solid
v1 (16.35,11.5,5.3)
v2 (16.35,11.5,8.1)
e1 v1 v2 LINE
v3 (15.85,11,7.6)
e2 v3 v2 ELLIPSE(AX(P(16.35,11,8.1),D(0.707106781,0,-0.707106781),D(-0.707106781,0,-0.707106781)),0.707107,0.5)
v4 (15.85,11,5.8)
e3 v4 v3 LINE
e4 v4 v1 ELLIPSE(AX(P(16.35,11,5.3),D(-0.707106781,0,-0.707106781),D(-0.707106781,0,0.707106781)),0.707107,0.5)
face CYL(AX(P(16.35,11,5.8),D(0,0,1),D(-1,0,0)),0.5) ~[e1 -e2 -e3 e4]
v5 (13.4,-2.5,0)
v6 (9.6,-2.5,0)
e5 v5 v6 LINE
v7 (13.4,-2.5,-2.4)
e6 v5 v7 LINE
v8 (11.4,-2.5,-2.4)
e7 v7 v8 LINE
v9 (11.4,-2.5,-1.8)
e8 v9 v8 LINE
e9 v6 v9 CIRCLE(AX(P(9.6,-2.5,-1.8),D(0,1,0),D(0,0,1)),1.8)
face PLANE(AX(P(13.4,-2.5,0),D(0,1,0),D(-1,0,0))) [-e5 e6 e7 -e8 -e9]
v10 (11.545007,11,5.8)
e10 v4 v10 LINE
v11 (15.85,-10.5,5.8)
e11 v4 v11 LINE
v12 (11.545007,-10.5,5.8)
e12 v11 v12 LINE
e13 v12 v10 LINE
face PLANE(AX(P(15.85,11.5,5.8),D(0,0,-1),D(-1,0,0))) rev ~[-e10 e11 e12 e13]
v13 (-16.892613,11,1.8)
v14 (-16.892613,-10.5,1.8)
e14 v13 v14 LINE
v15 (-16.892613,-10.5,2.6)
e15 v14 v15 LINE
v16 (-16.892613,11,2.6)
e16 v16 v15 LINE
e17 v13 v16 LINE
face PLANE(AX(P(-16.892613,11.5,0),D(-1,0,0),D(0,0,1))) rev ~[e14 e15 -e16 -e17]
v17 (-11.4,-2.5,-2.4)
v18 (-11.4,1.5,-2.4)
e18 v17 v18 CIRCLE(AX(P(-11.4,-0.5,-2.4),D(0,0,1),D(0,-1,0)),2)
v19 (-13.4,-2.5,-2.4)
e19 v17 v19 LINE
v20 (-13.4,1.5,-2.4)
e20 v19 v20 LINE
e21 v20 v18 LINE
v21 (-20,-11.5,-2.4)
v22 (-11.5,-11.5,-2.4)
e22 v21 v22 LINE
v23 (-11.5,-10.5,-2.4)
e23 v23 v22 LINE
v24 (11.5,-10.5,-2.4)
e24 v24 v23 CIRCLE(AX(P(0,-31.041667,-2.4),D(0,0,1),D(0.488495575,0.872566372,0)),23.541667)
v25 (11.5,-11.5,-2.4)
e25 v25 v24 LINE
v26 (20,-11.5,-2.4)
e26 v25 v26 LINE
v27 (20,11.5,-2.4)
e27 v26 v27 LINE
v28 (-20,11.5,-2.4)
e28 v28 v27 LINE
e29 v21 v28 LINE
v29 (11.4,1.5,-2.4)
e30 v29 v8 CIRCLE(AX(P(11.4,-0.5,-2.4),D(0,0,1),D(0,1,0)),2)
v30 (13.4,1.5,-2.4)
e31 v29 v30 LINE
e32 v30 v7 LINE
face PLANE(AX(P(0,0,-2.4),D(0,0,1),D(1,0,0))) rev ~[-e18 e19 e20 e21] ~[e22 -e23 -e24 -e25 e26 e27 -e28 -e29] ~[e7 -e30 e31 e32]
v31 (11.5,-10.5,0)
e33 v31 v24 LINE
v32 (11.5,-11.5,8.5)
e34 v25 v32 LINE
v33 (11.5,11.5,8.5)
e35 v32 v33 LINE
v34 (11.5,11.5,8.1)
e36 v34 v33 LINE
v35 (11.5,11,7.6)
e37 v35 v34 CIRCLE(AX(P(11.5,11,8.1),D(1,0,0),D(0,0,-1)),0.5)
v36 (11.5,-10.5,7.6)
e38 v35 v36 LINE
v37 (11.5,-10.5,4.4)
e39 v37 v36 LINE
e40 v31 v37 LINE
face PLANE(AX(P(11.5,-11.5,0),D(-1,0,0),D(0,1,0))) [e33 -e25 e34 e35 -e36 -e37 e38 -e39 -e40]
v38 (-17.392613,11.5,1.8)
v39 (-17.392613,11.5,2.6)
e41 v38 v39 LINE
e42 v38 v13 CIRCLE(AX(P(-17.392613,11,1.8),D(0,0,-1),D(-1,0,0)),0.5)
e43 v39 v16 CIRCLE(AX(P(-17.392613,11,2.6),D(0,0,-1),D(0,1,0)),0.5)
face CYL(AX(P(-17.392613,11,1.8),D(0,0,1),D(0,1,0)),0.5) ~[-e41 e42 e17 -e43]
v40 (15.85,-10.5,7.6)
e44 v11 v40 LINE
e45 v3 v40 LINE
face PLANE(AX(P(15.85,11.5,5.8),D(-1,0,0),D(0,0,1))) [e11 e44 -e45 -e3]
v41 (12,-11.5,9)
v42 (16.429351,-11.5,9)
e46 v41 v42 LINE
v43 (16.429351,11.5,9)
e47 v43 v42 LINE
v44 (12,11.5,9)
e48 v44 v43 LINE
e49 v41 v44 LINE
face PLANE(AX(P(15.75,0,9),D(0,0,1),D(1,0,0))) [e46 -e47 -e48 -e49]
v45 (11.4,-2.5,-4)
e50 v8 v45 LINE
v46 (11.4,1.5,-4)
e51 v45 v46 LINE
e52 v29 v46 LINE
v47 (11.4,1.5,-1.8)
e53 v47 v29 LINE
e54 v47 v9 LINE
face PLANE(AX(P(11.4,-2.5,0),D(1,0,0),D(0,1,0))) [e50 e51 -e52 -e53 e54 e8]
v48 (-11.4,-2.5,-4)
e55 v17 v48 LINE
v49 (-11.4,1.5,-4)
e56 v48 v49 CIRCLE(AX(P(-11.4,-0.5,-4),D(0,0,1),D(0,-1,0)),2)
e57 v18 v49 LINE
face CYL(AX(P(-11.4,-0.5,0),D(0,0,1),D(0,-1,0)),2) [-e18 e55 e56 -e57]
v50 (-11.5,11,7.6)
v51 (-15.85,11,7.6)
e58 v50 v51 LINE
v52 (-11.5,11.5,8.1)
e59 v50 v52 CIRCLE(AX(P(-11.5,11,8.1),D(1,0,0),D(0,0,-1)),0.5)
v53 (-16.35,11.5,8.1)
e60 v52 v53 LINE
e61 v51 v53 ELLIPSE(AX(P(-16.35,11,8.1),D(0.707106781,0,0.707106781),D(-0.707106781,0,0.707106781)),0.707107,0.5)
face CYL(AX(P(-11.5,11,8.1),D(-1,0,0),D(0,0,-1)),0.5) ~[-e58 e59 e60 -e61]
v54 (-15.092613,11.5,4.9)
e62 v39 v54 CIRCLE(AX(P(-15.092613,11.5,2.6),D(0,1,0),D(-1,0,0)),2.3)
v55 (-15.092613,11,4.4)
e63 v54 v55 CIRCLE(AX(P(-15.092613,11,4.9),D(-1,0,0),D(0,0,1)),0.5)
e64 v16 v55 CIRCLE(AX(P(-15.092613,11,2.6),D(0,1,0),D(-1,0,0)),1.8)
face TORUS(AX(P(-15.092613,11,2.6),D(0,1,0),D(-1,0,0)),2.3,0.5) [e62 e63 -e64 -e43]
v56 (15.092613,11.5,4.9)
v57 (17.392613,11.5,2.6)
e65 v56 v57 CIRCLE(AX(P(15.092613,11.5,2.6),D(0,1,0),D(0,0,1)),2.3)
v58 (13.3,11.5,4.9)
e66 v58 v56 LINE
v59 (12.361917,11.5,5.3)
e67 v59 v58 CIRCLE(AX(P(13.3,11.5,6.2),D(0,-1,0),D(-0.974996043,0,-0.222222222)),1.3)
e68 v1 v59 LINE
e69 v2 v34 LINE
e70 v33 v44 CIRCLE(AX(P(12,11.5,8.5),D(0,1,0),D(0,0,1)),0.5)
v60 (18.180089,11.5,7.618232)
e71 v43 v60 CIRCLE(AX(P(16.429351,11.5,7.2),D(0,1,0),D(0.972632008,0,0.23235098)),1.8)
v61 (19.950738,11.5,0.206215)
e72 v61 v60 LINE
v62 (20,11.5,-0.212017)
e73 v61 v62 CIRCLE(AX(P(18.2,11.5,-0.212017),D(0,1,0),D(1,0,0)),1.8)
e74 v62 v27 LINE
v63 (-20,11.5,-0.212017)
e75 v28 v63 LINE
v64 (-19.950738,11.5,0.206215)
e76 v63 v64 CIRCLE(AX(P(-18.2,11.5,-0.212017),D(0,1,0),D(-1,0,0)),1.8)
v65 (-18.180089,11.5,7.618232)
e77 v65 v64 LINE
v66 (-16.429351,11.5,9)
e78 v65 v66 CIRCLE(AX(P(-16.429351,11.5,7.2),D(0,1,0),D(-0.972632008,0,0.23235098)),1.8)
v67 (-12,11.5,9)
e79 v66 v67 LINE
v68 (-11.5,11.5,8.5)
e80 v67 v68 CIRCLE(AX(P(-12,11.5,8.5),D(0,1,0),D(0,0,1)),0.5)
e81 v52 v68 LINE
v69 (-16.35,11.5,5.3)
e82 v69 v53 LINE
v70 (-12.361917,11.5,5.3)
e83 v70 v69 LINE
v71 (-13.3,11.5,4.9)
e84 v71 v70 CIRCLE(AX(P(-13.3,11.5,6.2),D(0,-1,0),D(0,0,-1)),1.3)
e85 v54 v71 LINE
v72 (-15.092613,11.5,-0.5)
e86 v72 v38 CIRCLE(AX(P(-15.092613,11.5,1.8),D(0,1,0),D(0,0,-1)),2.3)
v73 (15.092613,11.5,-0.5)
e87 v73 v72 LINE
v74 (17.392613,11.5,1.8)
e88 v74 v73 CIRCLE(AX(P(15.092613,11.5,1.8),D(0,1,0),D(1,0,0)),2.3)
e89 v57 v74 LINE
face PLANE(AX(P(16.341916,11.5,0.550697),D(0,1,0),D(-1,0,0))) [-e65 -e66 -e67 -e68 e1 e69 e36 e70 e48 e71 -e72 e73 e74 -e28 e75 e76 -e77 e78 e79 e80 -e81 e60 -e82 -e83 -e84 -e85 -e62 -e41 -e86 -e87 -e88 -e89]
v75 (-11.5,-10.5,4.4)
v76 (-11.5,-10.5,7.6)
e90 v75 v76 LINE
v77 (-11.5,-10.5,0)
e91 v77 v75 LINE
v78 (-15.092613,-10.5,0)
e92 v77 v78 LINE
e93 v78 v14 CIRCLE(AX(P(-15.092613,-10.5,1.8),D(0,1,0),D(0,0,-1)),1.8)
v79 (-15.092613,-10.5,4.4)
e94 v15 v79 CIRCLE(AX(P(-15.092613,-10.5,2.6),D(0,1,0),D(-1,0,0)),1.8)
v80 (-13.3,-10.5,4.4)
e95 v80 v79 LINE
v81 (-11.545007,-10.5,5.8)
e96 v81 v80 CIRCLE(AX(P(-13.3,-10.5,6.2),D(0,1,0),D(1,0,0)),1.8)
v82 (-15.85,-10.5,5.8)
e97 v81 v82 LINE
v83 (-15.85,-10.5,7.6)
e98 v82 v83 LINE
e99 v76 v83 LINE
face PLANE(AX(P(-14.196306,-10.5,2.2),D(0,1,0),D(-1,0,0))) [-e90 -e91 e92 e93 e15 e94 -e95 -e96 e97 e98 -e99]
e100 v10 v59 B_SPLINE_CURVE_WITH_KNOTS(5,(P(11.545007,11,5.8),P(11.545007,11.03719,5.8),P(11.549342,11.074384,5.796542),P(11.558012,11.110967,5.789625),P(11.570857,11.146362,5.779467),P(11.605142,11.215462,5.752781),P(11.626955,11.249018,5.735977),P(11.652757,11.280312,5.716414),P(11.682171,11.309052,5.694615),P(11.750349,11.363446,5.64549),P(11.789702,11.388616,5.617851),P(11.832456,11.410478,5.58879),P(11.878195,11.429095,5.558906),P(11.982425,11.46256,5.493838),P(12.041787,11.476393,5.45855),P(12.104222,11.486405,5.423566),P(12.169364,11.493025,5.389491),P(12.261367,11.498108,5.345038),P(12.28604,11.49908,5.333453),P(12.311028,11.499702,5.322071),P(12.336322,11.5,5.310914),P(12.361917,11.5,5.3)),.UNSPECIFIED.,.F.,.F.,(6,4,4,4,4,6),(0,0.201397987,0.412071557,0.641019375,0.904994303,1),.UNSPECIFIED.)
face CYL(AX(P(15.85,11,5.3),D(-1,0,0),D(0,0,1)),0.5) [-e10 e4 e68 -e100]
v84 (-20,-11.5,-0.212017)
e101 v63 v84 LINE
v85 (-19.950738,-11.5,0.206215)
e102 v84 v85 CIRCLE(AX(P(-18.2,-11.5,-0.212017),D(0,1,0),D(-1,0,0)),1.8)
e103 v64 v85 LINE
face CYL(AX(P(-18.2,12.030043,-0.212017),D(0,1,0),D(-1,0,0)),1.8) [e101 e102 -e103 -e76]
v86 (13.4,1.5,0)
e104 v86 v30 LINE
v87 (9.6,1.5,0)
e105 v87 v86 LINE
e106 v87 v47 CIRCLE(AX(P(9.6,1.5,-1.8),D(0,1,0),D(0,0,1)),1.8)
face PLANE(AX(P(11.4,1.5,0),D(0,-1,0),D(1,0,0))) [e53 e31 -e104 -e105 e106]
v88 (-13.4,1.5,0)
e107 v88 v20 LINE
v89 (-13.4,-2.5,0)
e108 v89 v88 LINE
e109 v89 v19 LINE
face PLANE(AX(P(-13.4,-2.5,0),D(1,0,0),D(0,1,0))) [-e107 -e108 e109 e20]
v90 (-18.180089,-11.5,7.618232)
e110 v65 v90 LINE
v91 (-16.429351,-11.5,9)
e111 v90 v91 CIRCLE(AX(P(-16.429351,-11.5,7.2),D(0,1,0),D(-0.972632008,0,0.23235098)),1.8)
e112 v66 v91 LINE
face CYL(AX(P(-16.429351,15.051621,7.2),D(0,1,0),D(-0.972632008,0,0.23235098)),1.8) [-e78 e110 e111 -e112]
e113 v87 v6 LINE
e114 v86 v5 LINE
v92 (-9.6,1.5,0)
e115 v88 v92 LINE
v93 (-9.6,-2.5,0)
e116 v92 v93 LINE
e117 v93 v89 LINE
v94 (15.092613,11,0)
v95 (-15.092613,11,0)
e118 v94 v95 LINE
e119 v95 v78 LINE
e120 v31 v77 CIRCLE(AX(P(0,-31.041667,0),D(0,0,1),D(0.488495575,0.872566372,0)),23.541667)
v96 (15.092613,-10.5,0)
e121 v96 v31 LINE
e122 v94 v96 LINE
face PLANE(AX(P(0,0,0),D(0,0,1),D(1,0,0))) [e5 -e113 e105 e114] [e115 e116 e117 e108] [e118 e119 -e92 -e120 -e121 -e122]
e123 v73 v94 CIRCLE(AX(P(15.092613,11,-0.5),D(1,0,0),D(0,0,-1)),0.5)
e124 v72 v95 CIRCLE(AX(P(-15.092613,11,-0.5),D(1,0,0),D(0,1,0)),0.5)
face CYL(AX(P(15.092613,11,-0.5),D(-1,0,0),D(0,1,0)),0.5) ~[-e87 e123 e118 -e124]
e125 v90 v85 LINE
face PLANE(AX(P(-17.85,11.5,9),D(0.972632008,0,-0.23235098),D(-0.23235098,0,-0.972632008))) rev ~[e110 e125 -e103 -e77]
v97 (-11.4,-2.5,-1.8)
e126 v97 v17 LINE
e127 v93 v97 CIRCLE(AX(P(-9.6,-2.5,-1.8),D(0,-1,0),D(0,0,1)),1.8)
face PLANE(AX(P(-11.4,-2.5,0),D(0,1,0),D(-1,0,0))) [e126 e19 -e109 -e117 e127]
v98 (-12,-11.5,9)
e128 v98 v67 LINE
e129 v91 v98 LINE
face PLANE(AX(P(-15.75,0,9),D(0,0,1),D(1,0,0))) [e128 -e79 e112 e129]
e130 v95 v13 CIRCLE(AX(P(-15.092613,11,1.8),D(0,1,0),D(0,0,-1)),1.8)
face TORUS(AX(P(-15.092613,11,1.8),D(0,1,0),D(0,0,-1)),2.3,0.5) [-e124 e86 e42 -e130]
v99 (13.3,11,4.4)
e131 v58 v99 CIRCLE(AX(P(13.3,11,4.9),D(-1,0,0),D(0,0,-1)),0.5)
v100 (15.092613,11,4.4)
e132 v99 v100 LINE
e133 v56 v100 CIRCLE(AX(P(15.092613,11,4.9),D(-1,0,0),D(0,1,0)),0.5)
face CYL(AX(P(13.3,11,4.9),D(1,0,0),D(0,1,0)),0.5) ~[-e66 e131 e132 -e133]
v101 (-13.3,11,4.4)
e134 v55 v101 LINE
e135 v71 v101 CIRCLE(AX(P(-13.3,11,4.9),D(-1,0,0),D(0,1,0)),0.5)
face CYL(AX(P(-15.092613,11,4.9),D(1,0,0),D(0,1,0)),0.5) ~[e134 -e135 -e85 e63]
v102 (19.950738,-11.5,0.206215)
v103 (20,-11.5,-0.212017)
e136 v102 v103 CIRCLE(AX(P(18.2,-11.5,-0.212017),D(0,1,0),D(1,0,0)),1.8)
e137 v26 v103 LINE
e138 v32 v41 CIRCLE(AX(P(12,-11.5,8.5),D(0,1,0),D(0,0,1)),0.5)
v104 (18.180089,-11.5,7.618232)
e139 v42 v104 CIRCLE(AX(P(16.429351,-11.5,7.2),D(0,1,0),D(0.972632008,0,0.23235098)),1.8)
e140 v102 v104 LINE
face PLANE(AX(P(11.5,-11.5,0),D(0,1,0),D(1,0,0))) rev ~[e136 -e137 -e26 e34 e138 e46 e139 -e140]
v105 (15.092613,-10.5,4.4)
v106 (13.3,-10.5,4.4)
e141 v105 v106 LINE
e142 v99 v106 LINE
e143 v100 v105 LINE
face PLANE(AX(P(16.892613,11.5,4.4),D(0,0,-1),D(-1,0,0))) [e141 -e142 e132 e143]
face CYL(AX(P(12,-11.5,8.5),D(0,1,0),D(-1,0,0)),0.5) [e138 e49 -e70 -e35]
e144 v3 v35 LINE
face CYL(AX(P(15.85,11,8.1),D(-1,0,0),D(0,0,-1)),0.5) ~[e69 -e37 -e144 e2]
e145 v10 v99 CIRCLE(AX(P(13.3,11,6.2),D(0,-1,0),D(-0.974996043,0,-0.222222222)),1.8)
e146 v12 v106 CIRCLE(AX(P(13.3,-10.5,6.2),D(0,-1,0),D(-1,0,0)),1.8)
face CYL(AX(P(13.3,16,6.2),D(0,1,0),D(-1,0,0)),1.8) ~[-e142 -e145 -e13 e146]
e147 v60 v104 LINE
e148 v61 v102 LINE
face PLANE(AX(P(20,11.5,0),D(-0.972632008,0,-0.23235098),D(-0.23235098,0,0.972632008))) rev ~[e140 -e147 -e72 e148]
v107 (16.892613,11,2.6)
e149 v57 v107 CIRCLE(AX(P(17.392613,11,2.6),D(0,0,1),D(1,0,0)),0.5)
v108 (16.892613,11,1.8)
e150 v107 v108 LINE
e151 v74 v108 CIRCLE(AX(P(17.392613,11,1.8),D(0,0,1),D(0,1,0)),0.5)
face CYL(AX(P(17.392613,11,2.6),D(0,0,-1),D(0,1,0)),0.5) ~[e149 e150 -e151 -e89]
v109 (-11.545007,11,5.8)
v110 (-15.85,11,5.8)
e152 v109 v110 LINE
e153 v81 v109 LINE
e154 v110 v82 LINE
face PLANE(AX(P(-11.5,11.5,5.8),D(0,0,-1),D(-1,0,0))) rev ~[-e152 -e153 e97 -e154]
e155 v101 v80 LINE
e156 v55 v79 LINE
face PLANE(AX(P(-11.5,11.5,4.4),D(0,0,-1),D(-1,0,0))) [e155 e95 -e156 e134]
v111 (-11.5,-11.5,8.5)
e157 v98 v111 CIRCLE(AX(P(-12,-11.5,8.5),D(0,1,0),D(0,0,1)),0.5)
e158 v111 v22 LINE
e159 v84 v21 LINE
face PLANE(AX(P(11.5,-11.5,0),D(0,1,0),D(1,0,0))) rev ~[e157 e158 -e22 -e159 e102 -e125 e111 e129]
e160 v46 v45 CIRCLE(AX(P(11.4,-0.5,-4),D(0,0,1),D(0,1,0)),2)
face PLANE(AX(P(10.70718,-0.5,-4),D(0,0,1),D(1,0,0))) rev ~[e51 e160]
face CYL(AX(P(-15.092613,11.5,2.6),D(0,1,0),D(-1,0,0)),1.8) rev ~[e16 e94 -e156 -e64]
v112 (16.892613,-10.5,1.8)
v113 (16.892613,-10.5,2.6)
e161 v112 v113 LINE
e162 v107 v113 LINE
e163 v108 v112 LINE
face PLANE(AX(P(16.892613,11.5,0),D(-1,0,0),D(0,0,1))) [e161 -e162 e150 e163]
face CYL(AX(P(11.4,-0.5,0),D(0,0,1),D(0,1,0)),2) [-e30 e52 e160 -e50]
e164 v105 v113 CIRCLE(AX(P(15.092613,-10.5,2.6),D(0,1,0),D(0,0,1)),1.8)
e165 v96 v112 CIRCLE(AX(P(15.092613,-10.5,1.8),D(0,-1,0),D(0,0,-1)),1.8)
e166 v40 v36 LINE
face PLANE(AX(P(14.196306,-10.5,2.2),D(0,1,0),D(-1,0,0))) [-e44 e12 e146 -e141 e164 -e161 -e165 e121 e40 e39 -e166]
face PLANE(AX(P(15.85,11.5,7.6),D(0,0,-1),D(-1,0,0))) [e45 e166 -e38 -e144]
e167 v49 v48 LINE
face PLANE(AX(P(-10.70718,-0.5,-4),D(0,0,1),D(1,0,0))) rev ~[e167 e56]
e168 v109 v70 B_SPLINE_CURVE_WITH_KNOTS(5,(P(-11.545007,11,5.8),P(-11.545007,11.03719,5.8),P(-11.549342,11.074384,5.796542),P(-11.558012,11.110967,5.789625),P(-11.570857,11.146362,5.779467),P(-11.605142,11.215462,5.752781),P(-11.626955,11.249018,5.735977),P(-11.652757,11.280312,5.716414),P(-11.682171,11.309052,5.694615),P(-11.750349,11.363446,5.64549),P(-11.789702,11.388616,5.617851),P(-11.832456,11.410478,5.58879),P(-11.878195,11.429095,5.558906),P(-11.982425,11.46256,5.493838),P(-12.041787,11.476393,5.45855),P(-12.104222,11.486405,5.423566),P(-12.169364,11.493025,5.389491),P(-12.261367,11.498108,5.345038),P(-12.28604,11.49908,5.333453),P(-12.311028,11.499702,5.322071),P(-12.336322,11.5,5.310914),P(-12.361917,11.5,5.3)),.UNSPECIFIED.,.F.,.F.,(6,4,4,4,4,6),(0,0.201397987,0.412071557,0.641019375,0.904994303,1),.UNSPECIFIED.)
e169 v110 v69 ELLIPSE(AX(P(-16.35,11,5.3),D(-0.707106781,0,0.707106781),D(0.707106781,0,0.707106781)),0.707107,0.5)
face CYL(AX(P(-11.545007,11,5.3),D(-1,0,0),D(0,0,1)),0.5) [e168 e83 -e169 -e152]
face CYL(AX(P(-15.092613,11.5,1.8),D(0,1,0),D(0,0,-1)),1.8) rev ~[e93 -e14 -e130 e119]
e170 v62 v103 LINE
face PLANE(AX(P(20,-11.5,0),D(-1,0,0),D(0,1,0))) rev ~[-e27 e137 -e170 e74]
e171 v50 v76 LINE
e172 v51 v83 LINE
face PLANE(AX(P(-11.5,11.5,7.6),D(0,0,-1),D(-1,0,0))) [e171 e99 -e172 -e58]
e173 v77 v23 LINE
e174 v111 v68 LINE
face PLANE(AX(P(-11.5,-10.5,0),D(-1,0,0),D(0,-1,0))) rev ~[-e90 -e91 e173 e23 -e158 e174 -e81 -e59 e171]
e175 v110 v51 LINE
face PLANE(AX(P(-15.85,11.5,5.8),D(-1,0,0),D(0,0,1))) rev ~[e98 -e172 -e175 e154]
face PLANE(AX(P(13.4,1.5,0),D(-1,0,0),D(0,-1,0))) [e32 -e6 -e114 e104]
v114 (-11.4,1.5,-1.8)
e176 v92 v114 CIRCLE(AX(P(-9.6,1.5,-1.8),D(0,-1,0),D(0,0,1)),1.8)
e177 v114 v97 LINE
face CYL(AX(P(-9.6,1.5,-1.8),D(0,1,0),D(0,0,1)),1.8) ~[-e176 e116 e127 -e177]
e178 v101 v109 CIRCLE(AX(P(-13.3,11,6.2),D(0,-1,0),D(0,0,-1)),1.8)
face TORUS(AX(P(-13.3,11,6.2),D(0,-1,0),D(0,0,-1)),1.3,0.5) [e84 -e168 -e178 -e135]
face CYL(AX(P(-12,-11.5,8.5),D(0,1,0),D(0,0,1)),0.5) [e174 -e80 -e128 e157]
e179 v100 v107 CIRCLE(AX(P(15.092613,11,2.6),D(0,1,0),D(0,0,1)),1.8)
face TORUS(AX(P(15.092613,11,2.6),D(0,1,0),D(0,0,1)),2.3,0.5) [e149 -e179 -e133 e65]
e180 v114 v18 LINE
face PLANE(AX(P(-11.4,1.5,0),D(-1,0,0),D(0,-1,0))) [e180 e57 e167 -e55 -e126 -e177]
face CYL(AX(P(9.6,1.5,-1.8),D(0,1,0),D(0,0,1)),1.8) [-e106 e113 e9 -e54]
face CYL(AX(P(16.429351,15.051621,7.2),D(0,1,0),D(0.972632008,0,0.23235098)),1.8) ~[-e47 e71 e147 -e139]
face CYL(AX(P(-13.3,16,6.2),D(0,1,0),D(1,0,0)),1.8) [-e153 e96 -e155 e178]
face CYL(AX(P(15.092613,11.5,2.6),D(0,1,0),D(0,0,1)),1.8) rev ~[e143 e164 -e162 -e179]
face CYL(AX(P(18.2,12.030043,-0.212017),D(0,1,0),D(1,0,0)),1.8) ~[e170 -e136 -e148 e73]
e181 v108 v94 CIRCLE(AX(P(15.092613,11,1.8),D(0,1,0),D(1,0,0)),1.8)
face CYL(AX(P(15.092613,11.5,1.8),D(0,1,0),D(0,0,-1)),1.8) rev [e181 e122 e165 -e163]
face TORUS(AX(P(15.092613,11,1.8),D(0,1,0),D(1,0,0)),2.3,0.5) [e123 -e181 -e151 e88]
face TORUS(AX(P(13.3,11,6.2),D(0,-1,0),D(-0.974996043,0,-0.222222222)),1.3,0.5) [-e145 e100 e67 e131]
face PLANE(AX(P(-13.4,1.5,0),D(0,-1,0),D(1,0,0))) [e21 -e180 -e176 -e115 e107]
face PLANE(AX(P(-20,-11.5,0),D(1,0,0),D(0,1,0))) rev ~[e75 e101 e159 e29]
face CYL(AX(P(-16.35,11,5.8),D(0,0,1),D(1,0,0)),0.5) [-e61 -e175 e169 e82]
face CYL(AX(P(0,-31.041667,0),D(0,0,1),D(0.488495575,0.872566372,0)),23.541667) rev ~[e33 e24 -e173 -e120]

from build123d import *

# Parameters (mm, degrees)
F0_W        = 40
F0_H        = 23
F1_DEPTH    = 2.4
F2_W        = 8.5
F2_H        = 23
F3_DEPTH    = 9
F4_DEPTH    = 4
F5_W        = 4.35
F5_H        = 1.8
F5_W_2      = 5.3926127389
F5_H_2      = 4.4
F6_DEPTH    = 22
F7_DEPTH    = 23.001
F8_T1_DEPTH = 22
F8_T3_DEPTH = 24.0600856157
F8_T5_DEPTH = 30.1032426749
F8_T7_DEPTH = 4
F8_T9_DEPTH = 26.5
F9_R        = 0.5
F11_DEPTH   = 4.001


# Not quite as in the source:
# - a fillet or chamfer that OpenCascade refuses, or shapes differently, is made with other operations: its cross-section is extruded or revolved along the edge and cut away or added


with BuildPart() as f1:
    # F0 (on Top) → F1 (new body)
    with BuildSketch(Plane.XY):
        Rectangle(F0_W, F0_H)
        with BuildLine():
            ThreePointArc((-11.4, 1.5), (-9.4, -0.5), (-11.4, -2.5))
            Line((-11.4, -2.5), (-13.4, -2.5))
            Line((-13.4, -2.5), (-13.4, 1.5))
            Line((-13.4, 1.5), (-11.4, 1.5))
        make_face(mode=Mode.SUBTRACT)
        with BuildLine():
            ThreePointArc((11.4, -2.5), (9.4, -0.5), (11.4, 1.5))
            Line((11.4, 1.5), (13.4, 1.5))
            Line((13.4, 1.5), (13.4, -2.5))
            Line((13.4, -2.5), (11.4, -2.5))
        make_face(mode=Mode.SUBTRACT)
        with BuildLine():
            Line((-11.4, 1.5), (-11.4, -2.5))
            ThreePointArc((-11.4, -2.5), (-9.4, -0.5), (-11.4, 1.5))
        make_face()
        with BuildLine():
            Line((11.4, -2.5), (11.4, 1.5))
            ThreePointArc((11.4, 1.5), (9.4, -0.5), (11.4, -2.5))
        make_face()
    extrude(amount=-F1_DEPTH)

    # F2 (on face) → F3 (join)
    with BuildSketch(Plane.XY):
        with Locations((15.75, 0)):
            Rectangle(F2_W, F2_H)
        with Locations((-15.75, 0)):
            Rectangle(F2_W, F2_H)
    extrude(amount=F3_DEPTH)

    # F0 (on Top) → F4 (join)
    with BuildSketch(Plane.XY):
        with BuildLine():
            Line((-11.4, 1.5), (-11.4, -2.5))
            ThreePointArc((-11.4, -2.5), (-9.4, -0.5), (-11.4, 1.5))
        make_face()
        with BuildLine():
            Line((11.4, -2.5), (11.4, 1.5))
            ThreePointArc((11.4, 1.5), (9.4, -0.5), (11.4, -2.5))
        make_face()
    extrude(amount=-F4_DEPTH)

    # F5 (on face) → F6 (cut)
    with BuildSketch(Plane(origin=(0, 11.5, 0), x_dir=(-1, 0, 0), z_dir=(0, 1, 0))):
        with Locations((-13.675, 6.7)):
            Rectangle(F5_W, F5_H)
        with Locations((13.675, 6.7)):
            Rectangle(F5_W, F5_H)
        with Locations((14.1963063695, 2.2)):
            Rectangle(F5_W_2, F5_H_2)
        with Locations((-14.1963063695, 2.2)):
            Rectangle(F5_W_2, F5_H_2)
    extrude(amount=-F6_DEPTH, mode=Mode.SUBTRACT)

    # F5 (on face) → F7 (cut, through all)
    with BuildSketch(Plane(origin=(0, 11.5, 0), x_dir=(-1, 0, 0), z_dir=(0, 1, 0))):
        Polygon((-20, 0), (-17.85, 9), (-20, 9), align=None)
        Polygon((20, 9), (17.85, 9), (20, 0), align=None)
    extrude(amount=-F7_DEPTH, mode=Mode.SUBTRACT)

    # F8: fillet of radius 1.8 on 12 edges, made by hand

    # F8_s2 → F8_t1 (join)
    with BuildSketch(Plane.XZ.offset(-11.5)):
        with BuildLine():
            ThreePointArc((15.0926127389, 0), (16.3654049451, 0.5272077939), (16.8926127389, 1.8))
            Line((16.8926127389, 1.8), (16.8926127389, 0))
            Line((16.8926127389, 0), (15.0926127389, 0))
        make_face()
        with BuildLine():
            ThreePointArc((15.0926127389, 4.4), (16.3654049451, 3.8727922061), (16.8926127389, 2.6))
            Line((16.8926127389, 2.6), (16.8926127389, 4.4))
            Line((16.8926127389, 4.4), (15.0926127389, 4.4))
        make_face()
        with BuildLine():
            ThreePointArc((-16.8926127389, 2.6), (-16.3654049451, 3.8727922061), (-15.0926127389, 4.4))
            Line((-15.0926127389, 4.4), (-16.8926127389, 4.4))
            Line((-16.8926127389, 4.4), (-16.8926127389, 2.6))
        make_face()
        with BuildLine():
            ThreePointArc((-15.0926127389, 0), (-16.3654049451, 0.5272077939), (-16.8926127389, 1.8))
            Line((-16.8926127389, 1.8), (-16.8926127389, 0))
            Line((-16.8926127389, 0), (-15.0926127389, 0))
        make_face()
    extrude(amount=F8_T1_DEPTH)

    # F8_s4 → F8_t3 (cut)
    with BuildSketch(Plane.XZ.offset(-12.0300428079)):
        with BuildLine():
            ThreePointArc((20, -0.2120171231), (19.987641981, -0.0014556176), (19.9507376137, 0.2062146401))
            Line((19.9507376137, 0.2062146401), (20, 0))
            Line((20, 0), (20, -0.2120171231))
        make_face()
        with BuildLine():
            ThreePointArc((-20, -0.2120171231), (-19.987641981, -0.0014556176), (-19.9507376137, 0.2062146401))
            Line((-19.9507376137, 0.2062146401), (-20, 0))
            Line((-20, 0), (-20, -0.2120171231))
        make_face()
    extrude(amount=F8_T3_DEPTH, mode=Mode.SUBTRACT)

    # F8_s6 → F8_t5 (cut)
    with BuildSketch(Plane.XZ.offset(-15.0516213374)):
        with BuildLine():
            ThreePointArc((18.1800890788, 7.6182317633), (17.5445157637, 8.6129432356), (16.429351465, 9))
            Line((16.429351465, 9), (17.85, 9))
            Line((17.85, 9), (18.1800890788, 7.6182317633))
        make_face()
        with BuildLine():
            ThreePointArc((-18.1800890788, 7.6182317633), (-17.5445157637, 8.6129432356), (-16.429351465, 9))
            Line((-16.429351465, 9), (-17.85, 9))
            Line((-17.85, 9), (-18.1800890788, 7.6182317633))
        make_face()
    extrude(amount=F8_T5_DEPTH, mode=Mode.SUBTRACT)

    # F8_s8 → F8_t7 (cut)
    with BuildSketch(Plane.XZ.offset(-1.5)):
        with BuildLine():
            ThreePointArc((-9.6, 0), (-10.8727922061, -0.5272077939), (-11.4, -1.8))
            Line((-11.4, -1.8), (-11.4, 0))
            Line((-11.4, 0), (-9.6, 0))
        make_face()
        with BuildLine():
            ThreePointArc((9.6, 0), (10.8727922061, -0.5272077939), (11.4, -1.8))
            Line((11.4, -1.8), (11.4, 0))
            Line((11.4, 0), (9.6, 0))
        make_face()
    extrude(amount=F8_T7_DEPTH, mode=Mode.SUBTRACT)

    # F8_s10 → F8_t9 (cut)
    with BuildSketch(Plane.XZ.offset(-16)):
        with BuildLine():
            ThreePointArc((-11.5, 6.2), (-12.0272077939, 4.9272077939), (-13.3, 4.4))
            Line((-13.3, 4.4), (-11.5, 4.4))
            Line((-11.5, 4.4), (-11.5, 6.2))
        make_face()
        with BuildLine():
            ThreePointArc((11.5, 6.2), (12.0272077939, 4.9272077939), (13.3, 4.4))
            Line((13.3, 4.4), (11.5, 4.4))
            Line((11.5, 4.4), (11.5, 6.2))
        make_face()
    extrude(amount=F8_T9_DEPTH, mode=Mode.SUBTRACT)

    # F9
    f9_edges = [f1.edges().sort_by_distance(p)[0] for p in [
        (-15.85, 11.5, 6.7),
        (-13.675, 11.5, 7.6),
        (-13.697504, 11.5, 5.8),
        (13.697504, 11.5, 5.8),
        (13.675, 11.5, 7.6),
        (15.85, 11.5, 6.7),
        (11.5, 0, 9),
        (-11.5, 0, 9),
        (0, 11.5, 0),
        (12.177503, 11.5, 4.792875),
        (14.196306, 11.5, 4.4),
        (16.365405, 11.5, 3.872792),
        (16.892613, 11.5, 2.2),
        (16.365405, 11.5, 0.527208),
        (-16.365405, 11.5, 0.527208),
        (-16.892613, 11.5, 2.2),
        (-16.365405, 11.5, 3.872792),
        (-14.196306, 11.5, 4.4),
        (-12.177503, 11.5, 4.792875),
    ]]
    fillet(f9_edges, radius=F9_R)

    # F10 (on face) → F11 (cut, through all)
    with BuildSketch(Plane.XY):
        with BuildLine():
            Line((11.5, -11.5), (11.5, -10.5))
            ThreePointArc((11.5, -10.5), (0, -7.5), (-11.5, -10.5))
            Line((-11.5, -10.5), (-11.5, -11.5))
            Line((-11.5, -11.5), (11.5, -11.5))
        make_face()
    extrude(amount=-F11_DEPTH, mode=Mode.SUBTRACT)


solid = f1.part
